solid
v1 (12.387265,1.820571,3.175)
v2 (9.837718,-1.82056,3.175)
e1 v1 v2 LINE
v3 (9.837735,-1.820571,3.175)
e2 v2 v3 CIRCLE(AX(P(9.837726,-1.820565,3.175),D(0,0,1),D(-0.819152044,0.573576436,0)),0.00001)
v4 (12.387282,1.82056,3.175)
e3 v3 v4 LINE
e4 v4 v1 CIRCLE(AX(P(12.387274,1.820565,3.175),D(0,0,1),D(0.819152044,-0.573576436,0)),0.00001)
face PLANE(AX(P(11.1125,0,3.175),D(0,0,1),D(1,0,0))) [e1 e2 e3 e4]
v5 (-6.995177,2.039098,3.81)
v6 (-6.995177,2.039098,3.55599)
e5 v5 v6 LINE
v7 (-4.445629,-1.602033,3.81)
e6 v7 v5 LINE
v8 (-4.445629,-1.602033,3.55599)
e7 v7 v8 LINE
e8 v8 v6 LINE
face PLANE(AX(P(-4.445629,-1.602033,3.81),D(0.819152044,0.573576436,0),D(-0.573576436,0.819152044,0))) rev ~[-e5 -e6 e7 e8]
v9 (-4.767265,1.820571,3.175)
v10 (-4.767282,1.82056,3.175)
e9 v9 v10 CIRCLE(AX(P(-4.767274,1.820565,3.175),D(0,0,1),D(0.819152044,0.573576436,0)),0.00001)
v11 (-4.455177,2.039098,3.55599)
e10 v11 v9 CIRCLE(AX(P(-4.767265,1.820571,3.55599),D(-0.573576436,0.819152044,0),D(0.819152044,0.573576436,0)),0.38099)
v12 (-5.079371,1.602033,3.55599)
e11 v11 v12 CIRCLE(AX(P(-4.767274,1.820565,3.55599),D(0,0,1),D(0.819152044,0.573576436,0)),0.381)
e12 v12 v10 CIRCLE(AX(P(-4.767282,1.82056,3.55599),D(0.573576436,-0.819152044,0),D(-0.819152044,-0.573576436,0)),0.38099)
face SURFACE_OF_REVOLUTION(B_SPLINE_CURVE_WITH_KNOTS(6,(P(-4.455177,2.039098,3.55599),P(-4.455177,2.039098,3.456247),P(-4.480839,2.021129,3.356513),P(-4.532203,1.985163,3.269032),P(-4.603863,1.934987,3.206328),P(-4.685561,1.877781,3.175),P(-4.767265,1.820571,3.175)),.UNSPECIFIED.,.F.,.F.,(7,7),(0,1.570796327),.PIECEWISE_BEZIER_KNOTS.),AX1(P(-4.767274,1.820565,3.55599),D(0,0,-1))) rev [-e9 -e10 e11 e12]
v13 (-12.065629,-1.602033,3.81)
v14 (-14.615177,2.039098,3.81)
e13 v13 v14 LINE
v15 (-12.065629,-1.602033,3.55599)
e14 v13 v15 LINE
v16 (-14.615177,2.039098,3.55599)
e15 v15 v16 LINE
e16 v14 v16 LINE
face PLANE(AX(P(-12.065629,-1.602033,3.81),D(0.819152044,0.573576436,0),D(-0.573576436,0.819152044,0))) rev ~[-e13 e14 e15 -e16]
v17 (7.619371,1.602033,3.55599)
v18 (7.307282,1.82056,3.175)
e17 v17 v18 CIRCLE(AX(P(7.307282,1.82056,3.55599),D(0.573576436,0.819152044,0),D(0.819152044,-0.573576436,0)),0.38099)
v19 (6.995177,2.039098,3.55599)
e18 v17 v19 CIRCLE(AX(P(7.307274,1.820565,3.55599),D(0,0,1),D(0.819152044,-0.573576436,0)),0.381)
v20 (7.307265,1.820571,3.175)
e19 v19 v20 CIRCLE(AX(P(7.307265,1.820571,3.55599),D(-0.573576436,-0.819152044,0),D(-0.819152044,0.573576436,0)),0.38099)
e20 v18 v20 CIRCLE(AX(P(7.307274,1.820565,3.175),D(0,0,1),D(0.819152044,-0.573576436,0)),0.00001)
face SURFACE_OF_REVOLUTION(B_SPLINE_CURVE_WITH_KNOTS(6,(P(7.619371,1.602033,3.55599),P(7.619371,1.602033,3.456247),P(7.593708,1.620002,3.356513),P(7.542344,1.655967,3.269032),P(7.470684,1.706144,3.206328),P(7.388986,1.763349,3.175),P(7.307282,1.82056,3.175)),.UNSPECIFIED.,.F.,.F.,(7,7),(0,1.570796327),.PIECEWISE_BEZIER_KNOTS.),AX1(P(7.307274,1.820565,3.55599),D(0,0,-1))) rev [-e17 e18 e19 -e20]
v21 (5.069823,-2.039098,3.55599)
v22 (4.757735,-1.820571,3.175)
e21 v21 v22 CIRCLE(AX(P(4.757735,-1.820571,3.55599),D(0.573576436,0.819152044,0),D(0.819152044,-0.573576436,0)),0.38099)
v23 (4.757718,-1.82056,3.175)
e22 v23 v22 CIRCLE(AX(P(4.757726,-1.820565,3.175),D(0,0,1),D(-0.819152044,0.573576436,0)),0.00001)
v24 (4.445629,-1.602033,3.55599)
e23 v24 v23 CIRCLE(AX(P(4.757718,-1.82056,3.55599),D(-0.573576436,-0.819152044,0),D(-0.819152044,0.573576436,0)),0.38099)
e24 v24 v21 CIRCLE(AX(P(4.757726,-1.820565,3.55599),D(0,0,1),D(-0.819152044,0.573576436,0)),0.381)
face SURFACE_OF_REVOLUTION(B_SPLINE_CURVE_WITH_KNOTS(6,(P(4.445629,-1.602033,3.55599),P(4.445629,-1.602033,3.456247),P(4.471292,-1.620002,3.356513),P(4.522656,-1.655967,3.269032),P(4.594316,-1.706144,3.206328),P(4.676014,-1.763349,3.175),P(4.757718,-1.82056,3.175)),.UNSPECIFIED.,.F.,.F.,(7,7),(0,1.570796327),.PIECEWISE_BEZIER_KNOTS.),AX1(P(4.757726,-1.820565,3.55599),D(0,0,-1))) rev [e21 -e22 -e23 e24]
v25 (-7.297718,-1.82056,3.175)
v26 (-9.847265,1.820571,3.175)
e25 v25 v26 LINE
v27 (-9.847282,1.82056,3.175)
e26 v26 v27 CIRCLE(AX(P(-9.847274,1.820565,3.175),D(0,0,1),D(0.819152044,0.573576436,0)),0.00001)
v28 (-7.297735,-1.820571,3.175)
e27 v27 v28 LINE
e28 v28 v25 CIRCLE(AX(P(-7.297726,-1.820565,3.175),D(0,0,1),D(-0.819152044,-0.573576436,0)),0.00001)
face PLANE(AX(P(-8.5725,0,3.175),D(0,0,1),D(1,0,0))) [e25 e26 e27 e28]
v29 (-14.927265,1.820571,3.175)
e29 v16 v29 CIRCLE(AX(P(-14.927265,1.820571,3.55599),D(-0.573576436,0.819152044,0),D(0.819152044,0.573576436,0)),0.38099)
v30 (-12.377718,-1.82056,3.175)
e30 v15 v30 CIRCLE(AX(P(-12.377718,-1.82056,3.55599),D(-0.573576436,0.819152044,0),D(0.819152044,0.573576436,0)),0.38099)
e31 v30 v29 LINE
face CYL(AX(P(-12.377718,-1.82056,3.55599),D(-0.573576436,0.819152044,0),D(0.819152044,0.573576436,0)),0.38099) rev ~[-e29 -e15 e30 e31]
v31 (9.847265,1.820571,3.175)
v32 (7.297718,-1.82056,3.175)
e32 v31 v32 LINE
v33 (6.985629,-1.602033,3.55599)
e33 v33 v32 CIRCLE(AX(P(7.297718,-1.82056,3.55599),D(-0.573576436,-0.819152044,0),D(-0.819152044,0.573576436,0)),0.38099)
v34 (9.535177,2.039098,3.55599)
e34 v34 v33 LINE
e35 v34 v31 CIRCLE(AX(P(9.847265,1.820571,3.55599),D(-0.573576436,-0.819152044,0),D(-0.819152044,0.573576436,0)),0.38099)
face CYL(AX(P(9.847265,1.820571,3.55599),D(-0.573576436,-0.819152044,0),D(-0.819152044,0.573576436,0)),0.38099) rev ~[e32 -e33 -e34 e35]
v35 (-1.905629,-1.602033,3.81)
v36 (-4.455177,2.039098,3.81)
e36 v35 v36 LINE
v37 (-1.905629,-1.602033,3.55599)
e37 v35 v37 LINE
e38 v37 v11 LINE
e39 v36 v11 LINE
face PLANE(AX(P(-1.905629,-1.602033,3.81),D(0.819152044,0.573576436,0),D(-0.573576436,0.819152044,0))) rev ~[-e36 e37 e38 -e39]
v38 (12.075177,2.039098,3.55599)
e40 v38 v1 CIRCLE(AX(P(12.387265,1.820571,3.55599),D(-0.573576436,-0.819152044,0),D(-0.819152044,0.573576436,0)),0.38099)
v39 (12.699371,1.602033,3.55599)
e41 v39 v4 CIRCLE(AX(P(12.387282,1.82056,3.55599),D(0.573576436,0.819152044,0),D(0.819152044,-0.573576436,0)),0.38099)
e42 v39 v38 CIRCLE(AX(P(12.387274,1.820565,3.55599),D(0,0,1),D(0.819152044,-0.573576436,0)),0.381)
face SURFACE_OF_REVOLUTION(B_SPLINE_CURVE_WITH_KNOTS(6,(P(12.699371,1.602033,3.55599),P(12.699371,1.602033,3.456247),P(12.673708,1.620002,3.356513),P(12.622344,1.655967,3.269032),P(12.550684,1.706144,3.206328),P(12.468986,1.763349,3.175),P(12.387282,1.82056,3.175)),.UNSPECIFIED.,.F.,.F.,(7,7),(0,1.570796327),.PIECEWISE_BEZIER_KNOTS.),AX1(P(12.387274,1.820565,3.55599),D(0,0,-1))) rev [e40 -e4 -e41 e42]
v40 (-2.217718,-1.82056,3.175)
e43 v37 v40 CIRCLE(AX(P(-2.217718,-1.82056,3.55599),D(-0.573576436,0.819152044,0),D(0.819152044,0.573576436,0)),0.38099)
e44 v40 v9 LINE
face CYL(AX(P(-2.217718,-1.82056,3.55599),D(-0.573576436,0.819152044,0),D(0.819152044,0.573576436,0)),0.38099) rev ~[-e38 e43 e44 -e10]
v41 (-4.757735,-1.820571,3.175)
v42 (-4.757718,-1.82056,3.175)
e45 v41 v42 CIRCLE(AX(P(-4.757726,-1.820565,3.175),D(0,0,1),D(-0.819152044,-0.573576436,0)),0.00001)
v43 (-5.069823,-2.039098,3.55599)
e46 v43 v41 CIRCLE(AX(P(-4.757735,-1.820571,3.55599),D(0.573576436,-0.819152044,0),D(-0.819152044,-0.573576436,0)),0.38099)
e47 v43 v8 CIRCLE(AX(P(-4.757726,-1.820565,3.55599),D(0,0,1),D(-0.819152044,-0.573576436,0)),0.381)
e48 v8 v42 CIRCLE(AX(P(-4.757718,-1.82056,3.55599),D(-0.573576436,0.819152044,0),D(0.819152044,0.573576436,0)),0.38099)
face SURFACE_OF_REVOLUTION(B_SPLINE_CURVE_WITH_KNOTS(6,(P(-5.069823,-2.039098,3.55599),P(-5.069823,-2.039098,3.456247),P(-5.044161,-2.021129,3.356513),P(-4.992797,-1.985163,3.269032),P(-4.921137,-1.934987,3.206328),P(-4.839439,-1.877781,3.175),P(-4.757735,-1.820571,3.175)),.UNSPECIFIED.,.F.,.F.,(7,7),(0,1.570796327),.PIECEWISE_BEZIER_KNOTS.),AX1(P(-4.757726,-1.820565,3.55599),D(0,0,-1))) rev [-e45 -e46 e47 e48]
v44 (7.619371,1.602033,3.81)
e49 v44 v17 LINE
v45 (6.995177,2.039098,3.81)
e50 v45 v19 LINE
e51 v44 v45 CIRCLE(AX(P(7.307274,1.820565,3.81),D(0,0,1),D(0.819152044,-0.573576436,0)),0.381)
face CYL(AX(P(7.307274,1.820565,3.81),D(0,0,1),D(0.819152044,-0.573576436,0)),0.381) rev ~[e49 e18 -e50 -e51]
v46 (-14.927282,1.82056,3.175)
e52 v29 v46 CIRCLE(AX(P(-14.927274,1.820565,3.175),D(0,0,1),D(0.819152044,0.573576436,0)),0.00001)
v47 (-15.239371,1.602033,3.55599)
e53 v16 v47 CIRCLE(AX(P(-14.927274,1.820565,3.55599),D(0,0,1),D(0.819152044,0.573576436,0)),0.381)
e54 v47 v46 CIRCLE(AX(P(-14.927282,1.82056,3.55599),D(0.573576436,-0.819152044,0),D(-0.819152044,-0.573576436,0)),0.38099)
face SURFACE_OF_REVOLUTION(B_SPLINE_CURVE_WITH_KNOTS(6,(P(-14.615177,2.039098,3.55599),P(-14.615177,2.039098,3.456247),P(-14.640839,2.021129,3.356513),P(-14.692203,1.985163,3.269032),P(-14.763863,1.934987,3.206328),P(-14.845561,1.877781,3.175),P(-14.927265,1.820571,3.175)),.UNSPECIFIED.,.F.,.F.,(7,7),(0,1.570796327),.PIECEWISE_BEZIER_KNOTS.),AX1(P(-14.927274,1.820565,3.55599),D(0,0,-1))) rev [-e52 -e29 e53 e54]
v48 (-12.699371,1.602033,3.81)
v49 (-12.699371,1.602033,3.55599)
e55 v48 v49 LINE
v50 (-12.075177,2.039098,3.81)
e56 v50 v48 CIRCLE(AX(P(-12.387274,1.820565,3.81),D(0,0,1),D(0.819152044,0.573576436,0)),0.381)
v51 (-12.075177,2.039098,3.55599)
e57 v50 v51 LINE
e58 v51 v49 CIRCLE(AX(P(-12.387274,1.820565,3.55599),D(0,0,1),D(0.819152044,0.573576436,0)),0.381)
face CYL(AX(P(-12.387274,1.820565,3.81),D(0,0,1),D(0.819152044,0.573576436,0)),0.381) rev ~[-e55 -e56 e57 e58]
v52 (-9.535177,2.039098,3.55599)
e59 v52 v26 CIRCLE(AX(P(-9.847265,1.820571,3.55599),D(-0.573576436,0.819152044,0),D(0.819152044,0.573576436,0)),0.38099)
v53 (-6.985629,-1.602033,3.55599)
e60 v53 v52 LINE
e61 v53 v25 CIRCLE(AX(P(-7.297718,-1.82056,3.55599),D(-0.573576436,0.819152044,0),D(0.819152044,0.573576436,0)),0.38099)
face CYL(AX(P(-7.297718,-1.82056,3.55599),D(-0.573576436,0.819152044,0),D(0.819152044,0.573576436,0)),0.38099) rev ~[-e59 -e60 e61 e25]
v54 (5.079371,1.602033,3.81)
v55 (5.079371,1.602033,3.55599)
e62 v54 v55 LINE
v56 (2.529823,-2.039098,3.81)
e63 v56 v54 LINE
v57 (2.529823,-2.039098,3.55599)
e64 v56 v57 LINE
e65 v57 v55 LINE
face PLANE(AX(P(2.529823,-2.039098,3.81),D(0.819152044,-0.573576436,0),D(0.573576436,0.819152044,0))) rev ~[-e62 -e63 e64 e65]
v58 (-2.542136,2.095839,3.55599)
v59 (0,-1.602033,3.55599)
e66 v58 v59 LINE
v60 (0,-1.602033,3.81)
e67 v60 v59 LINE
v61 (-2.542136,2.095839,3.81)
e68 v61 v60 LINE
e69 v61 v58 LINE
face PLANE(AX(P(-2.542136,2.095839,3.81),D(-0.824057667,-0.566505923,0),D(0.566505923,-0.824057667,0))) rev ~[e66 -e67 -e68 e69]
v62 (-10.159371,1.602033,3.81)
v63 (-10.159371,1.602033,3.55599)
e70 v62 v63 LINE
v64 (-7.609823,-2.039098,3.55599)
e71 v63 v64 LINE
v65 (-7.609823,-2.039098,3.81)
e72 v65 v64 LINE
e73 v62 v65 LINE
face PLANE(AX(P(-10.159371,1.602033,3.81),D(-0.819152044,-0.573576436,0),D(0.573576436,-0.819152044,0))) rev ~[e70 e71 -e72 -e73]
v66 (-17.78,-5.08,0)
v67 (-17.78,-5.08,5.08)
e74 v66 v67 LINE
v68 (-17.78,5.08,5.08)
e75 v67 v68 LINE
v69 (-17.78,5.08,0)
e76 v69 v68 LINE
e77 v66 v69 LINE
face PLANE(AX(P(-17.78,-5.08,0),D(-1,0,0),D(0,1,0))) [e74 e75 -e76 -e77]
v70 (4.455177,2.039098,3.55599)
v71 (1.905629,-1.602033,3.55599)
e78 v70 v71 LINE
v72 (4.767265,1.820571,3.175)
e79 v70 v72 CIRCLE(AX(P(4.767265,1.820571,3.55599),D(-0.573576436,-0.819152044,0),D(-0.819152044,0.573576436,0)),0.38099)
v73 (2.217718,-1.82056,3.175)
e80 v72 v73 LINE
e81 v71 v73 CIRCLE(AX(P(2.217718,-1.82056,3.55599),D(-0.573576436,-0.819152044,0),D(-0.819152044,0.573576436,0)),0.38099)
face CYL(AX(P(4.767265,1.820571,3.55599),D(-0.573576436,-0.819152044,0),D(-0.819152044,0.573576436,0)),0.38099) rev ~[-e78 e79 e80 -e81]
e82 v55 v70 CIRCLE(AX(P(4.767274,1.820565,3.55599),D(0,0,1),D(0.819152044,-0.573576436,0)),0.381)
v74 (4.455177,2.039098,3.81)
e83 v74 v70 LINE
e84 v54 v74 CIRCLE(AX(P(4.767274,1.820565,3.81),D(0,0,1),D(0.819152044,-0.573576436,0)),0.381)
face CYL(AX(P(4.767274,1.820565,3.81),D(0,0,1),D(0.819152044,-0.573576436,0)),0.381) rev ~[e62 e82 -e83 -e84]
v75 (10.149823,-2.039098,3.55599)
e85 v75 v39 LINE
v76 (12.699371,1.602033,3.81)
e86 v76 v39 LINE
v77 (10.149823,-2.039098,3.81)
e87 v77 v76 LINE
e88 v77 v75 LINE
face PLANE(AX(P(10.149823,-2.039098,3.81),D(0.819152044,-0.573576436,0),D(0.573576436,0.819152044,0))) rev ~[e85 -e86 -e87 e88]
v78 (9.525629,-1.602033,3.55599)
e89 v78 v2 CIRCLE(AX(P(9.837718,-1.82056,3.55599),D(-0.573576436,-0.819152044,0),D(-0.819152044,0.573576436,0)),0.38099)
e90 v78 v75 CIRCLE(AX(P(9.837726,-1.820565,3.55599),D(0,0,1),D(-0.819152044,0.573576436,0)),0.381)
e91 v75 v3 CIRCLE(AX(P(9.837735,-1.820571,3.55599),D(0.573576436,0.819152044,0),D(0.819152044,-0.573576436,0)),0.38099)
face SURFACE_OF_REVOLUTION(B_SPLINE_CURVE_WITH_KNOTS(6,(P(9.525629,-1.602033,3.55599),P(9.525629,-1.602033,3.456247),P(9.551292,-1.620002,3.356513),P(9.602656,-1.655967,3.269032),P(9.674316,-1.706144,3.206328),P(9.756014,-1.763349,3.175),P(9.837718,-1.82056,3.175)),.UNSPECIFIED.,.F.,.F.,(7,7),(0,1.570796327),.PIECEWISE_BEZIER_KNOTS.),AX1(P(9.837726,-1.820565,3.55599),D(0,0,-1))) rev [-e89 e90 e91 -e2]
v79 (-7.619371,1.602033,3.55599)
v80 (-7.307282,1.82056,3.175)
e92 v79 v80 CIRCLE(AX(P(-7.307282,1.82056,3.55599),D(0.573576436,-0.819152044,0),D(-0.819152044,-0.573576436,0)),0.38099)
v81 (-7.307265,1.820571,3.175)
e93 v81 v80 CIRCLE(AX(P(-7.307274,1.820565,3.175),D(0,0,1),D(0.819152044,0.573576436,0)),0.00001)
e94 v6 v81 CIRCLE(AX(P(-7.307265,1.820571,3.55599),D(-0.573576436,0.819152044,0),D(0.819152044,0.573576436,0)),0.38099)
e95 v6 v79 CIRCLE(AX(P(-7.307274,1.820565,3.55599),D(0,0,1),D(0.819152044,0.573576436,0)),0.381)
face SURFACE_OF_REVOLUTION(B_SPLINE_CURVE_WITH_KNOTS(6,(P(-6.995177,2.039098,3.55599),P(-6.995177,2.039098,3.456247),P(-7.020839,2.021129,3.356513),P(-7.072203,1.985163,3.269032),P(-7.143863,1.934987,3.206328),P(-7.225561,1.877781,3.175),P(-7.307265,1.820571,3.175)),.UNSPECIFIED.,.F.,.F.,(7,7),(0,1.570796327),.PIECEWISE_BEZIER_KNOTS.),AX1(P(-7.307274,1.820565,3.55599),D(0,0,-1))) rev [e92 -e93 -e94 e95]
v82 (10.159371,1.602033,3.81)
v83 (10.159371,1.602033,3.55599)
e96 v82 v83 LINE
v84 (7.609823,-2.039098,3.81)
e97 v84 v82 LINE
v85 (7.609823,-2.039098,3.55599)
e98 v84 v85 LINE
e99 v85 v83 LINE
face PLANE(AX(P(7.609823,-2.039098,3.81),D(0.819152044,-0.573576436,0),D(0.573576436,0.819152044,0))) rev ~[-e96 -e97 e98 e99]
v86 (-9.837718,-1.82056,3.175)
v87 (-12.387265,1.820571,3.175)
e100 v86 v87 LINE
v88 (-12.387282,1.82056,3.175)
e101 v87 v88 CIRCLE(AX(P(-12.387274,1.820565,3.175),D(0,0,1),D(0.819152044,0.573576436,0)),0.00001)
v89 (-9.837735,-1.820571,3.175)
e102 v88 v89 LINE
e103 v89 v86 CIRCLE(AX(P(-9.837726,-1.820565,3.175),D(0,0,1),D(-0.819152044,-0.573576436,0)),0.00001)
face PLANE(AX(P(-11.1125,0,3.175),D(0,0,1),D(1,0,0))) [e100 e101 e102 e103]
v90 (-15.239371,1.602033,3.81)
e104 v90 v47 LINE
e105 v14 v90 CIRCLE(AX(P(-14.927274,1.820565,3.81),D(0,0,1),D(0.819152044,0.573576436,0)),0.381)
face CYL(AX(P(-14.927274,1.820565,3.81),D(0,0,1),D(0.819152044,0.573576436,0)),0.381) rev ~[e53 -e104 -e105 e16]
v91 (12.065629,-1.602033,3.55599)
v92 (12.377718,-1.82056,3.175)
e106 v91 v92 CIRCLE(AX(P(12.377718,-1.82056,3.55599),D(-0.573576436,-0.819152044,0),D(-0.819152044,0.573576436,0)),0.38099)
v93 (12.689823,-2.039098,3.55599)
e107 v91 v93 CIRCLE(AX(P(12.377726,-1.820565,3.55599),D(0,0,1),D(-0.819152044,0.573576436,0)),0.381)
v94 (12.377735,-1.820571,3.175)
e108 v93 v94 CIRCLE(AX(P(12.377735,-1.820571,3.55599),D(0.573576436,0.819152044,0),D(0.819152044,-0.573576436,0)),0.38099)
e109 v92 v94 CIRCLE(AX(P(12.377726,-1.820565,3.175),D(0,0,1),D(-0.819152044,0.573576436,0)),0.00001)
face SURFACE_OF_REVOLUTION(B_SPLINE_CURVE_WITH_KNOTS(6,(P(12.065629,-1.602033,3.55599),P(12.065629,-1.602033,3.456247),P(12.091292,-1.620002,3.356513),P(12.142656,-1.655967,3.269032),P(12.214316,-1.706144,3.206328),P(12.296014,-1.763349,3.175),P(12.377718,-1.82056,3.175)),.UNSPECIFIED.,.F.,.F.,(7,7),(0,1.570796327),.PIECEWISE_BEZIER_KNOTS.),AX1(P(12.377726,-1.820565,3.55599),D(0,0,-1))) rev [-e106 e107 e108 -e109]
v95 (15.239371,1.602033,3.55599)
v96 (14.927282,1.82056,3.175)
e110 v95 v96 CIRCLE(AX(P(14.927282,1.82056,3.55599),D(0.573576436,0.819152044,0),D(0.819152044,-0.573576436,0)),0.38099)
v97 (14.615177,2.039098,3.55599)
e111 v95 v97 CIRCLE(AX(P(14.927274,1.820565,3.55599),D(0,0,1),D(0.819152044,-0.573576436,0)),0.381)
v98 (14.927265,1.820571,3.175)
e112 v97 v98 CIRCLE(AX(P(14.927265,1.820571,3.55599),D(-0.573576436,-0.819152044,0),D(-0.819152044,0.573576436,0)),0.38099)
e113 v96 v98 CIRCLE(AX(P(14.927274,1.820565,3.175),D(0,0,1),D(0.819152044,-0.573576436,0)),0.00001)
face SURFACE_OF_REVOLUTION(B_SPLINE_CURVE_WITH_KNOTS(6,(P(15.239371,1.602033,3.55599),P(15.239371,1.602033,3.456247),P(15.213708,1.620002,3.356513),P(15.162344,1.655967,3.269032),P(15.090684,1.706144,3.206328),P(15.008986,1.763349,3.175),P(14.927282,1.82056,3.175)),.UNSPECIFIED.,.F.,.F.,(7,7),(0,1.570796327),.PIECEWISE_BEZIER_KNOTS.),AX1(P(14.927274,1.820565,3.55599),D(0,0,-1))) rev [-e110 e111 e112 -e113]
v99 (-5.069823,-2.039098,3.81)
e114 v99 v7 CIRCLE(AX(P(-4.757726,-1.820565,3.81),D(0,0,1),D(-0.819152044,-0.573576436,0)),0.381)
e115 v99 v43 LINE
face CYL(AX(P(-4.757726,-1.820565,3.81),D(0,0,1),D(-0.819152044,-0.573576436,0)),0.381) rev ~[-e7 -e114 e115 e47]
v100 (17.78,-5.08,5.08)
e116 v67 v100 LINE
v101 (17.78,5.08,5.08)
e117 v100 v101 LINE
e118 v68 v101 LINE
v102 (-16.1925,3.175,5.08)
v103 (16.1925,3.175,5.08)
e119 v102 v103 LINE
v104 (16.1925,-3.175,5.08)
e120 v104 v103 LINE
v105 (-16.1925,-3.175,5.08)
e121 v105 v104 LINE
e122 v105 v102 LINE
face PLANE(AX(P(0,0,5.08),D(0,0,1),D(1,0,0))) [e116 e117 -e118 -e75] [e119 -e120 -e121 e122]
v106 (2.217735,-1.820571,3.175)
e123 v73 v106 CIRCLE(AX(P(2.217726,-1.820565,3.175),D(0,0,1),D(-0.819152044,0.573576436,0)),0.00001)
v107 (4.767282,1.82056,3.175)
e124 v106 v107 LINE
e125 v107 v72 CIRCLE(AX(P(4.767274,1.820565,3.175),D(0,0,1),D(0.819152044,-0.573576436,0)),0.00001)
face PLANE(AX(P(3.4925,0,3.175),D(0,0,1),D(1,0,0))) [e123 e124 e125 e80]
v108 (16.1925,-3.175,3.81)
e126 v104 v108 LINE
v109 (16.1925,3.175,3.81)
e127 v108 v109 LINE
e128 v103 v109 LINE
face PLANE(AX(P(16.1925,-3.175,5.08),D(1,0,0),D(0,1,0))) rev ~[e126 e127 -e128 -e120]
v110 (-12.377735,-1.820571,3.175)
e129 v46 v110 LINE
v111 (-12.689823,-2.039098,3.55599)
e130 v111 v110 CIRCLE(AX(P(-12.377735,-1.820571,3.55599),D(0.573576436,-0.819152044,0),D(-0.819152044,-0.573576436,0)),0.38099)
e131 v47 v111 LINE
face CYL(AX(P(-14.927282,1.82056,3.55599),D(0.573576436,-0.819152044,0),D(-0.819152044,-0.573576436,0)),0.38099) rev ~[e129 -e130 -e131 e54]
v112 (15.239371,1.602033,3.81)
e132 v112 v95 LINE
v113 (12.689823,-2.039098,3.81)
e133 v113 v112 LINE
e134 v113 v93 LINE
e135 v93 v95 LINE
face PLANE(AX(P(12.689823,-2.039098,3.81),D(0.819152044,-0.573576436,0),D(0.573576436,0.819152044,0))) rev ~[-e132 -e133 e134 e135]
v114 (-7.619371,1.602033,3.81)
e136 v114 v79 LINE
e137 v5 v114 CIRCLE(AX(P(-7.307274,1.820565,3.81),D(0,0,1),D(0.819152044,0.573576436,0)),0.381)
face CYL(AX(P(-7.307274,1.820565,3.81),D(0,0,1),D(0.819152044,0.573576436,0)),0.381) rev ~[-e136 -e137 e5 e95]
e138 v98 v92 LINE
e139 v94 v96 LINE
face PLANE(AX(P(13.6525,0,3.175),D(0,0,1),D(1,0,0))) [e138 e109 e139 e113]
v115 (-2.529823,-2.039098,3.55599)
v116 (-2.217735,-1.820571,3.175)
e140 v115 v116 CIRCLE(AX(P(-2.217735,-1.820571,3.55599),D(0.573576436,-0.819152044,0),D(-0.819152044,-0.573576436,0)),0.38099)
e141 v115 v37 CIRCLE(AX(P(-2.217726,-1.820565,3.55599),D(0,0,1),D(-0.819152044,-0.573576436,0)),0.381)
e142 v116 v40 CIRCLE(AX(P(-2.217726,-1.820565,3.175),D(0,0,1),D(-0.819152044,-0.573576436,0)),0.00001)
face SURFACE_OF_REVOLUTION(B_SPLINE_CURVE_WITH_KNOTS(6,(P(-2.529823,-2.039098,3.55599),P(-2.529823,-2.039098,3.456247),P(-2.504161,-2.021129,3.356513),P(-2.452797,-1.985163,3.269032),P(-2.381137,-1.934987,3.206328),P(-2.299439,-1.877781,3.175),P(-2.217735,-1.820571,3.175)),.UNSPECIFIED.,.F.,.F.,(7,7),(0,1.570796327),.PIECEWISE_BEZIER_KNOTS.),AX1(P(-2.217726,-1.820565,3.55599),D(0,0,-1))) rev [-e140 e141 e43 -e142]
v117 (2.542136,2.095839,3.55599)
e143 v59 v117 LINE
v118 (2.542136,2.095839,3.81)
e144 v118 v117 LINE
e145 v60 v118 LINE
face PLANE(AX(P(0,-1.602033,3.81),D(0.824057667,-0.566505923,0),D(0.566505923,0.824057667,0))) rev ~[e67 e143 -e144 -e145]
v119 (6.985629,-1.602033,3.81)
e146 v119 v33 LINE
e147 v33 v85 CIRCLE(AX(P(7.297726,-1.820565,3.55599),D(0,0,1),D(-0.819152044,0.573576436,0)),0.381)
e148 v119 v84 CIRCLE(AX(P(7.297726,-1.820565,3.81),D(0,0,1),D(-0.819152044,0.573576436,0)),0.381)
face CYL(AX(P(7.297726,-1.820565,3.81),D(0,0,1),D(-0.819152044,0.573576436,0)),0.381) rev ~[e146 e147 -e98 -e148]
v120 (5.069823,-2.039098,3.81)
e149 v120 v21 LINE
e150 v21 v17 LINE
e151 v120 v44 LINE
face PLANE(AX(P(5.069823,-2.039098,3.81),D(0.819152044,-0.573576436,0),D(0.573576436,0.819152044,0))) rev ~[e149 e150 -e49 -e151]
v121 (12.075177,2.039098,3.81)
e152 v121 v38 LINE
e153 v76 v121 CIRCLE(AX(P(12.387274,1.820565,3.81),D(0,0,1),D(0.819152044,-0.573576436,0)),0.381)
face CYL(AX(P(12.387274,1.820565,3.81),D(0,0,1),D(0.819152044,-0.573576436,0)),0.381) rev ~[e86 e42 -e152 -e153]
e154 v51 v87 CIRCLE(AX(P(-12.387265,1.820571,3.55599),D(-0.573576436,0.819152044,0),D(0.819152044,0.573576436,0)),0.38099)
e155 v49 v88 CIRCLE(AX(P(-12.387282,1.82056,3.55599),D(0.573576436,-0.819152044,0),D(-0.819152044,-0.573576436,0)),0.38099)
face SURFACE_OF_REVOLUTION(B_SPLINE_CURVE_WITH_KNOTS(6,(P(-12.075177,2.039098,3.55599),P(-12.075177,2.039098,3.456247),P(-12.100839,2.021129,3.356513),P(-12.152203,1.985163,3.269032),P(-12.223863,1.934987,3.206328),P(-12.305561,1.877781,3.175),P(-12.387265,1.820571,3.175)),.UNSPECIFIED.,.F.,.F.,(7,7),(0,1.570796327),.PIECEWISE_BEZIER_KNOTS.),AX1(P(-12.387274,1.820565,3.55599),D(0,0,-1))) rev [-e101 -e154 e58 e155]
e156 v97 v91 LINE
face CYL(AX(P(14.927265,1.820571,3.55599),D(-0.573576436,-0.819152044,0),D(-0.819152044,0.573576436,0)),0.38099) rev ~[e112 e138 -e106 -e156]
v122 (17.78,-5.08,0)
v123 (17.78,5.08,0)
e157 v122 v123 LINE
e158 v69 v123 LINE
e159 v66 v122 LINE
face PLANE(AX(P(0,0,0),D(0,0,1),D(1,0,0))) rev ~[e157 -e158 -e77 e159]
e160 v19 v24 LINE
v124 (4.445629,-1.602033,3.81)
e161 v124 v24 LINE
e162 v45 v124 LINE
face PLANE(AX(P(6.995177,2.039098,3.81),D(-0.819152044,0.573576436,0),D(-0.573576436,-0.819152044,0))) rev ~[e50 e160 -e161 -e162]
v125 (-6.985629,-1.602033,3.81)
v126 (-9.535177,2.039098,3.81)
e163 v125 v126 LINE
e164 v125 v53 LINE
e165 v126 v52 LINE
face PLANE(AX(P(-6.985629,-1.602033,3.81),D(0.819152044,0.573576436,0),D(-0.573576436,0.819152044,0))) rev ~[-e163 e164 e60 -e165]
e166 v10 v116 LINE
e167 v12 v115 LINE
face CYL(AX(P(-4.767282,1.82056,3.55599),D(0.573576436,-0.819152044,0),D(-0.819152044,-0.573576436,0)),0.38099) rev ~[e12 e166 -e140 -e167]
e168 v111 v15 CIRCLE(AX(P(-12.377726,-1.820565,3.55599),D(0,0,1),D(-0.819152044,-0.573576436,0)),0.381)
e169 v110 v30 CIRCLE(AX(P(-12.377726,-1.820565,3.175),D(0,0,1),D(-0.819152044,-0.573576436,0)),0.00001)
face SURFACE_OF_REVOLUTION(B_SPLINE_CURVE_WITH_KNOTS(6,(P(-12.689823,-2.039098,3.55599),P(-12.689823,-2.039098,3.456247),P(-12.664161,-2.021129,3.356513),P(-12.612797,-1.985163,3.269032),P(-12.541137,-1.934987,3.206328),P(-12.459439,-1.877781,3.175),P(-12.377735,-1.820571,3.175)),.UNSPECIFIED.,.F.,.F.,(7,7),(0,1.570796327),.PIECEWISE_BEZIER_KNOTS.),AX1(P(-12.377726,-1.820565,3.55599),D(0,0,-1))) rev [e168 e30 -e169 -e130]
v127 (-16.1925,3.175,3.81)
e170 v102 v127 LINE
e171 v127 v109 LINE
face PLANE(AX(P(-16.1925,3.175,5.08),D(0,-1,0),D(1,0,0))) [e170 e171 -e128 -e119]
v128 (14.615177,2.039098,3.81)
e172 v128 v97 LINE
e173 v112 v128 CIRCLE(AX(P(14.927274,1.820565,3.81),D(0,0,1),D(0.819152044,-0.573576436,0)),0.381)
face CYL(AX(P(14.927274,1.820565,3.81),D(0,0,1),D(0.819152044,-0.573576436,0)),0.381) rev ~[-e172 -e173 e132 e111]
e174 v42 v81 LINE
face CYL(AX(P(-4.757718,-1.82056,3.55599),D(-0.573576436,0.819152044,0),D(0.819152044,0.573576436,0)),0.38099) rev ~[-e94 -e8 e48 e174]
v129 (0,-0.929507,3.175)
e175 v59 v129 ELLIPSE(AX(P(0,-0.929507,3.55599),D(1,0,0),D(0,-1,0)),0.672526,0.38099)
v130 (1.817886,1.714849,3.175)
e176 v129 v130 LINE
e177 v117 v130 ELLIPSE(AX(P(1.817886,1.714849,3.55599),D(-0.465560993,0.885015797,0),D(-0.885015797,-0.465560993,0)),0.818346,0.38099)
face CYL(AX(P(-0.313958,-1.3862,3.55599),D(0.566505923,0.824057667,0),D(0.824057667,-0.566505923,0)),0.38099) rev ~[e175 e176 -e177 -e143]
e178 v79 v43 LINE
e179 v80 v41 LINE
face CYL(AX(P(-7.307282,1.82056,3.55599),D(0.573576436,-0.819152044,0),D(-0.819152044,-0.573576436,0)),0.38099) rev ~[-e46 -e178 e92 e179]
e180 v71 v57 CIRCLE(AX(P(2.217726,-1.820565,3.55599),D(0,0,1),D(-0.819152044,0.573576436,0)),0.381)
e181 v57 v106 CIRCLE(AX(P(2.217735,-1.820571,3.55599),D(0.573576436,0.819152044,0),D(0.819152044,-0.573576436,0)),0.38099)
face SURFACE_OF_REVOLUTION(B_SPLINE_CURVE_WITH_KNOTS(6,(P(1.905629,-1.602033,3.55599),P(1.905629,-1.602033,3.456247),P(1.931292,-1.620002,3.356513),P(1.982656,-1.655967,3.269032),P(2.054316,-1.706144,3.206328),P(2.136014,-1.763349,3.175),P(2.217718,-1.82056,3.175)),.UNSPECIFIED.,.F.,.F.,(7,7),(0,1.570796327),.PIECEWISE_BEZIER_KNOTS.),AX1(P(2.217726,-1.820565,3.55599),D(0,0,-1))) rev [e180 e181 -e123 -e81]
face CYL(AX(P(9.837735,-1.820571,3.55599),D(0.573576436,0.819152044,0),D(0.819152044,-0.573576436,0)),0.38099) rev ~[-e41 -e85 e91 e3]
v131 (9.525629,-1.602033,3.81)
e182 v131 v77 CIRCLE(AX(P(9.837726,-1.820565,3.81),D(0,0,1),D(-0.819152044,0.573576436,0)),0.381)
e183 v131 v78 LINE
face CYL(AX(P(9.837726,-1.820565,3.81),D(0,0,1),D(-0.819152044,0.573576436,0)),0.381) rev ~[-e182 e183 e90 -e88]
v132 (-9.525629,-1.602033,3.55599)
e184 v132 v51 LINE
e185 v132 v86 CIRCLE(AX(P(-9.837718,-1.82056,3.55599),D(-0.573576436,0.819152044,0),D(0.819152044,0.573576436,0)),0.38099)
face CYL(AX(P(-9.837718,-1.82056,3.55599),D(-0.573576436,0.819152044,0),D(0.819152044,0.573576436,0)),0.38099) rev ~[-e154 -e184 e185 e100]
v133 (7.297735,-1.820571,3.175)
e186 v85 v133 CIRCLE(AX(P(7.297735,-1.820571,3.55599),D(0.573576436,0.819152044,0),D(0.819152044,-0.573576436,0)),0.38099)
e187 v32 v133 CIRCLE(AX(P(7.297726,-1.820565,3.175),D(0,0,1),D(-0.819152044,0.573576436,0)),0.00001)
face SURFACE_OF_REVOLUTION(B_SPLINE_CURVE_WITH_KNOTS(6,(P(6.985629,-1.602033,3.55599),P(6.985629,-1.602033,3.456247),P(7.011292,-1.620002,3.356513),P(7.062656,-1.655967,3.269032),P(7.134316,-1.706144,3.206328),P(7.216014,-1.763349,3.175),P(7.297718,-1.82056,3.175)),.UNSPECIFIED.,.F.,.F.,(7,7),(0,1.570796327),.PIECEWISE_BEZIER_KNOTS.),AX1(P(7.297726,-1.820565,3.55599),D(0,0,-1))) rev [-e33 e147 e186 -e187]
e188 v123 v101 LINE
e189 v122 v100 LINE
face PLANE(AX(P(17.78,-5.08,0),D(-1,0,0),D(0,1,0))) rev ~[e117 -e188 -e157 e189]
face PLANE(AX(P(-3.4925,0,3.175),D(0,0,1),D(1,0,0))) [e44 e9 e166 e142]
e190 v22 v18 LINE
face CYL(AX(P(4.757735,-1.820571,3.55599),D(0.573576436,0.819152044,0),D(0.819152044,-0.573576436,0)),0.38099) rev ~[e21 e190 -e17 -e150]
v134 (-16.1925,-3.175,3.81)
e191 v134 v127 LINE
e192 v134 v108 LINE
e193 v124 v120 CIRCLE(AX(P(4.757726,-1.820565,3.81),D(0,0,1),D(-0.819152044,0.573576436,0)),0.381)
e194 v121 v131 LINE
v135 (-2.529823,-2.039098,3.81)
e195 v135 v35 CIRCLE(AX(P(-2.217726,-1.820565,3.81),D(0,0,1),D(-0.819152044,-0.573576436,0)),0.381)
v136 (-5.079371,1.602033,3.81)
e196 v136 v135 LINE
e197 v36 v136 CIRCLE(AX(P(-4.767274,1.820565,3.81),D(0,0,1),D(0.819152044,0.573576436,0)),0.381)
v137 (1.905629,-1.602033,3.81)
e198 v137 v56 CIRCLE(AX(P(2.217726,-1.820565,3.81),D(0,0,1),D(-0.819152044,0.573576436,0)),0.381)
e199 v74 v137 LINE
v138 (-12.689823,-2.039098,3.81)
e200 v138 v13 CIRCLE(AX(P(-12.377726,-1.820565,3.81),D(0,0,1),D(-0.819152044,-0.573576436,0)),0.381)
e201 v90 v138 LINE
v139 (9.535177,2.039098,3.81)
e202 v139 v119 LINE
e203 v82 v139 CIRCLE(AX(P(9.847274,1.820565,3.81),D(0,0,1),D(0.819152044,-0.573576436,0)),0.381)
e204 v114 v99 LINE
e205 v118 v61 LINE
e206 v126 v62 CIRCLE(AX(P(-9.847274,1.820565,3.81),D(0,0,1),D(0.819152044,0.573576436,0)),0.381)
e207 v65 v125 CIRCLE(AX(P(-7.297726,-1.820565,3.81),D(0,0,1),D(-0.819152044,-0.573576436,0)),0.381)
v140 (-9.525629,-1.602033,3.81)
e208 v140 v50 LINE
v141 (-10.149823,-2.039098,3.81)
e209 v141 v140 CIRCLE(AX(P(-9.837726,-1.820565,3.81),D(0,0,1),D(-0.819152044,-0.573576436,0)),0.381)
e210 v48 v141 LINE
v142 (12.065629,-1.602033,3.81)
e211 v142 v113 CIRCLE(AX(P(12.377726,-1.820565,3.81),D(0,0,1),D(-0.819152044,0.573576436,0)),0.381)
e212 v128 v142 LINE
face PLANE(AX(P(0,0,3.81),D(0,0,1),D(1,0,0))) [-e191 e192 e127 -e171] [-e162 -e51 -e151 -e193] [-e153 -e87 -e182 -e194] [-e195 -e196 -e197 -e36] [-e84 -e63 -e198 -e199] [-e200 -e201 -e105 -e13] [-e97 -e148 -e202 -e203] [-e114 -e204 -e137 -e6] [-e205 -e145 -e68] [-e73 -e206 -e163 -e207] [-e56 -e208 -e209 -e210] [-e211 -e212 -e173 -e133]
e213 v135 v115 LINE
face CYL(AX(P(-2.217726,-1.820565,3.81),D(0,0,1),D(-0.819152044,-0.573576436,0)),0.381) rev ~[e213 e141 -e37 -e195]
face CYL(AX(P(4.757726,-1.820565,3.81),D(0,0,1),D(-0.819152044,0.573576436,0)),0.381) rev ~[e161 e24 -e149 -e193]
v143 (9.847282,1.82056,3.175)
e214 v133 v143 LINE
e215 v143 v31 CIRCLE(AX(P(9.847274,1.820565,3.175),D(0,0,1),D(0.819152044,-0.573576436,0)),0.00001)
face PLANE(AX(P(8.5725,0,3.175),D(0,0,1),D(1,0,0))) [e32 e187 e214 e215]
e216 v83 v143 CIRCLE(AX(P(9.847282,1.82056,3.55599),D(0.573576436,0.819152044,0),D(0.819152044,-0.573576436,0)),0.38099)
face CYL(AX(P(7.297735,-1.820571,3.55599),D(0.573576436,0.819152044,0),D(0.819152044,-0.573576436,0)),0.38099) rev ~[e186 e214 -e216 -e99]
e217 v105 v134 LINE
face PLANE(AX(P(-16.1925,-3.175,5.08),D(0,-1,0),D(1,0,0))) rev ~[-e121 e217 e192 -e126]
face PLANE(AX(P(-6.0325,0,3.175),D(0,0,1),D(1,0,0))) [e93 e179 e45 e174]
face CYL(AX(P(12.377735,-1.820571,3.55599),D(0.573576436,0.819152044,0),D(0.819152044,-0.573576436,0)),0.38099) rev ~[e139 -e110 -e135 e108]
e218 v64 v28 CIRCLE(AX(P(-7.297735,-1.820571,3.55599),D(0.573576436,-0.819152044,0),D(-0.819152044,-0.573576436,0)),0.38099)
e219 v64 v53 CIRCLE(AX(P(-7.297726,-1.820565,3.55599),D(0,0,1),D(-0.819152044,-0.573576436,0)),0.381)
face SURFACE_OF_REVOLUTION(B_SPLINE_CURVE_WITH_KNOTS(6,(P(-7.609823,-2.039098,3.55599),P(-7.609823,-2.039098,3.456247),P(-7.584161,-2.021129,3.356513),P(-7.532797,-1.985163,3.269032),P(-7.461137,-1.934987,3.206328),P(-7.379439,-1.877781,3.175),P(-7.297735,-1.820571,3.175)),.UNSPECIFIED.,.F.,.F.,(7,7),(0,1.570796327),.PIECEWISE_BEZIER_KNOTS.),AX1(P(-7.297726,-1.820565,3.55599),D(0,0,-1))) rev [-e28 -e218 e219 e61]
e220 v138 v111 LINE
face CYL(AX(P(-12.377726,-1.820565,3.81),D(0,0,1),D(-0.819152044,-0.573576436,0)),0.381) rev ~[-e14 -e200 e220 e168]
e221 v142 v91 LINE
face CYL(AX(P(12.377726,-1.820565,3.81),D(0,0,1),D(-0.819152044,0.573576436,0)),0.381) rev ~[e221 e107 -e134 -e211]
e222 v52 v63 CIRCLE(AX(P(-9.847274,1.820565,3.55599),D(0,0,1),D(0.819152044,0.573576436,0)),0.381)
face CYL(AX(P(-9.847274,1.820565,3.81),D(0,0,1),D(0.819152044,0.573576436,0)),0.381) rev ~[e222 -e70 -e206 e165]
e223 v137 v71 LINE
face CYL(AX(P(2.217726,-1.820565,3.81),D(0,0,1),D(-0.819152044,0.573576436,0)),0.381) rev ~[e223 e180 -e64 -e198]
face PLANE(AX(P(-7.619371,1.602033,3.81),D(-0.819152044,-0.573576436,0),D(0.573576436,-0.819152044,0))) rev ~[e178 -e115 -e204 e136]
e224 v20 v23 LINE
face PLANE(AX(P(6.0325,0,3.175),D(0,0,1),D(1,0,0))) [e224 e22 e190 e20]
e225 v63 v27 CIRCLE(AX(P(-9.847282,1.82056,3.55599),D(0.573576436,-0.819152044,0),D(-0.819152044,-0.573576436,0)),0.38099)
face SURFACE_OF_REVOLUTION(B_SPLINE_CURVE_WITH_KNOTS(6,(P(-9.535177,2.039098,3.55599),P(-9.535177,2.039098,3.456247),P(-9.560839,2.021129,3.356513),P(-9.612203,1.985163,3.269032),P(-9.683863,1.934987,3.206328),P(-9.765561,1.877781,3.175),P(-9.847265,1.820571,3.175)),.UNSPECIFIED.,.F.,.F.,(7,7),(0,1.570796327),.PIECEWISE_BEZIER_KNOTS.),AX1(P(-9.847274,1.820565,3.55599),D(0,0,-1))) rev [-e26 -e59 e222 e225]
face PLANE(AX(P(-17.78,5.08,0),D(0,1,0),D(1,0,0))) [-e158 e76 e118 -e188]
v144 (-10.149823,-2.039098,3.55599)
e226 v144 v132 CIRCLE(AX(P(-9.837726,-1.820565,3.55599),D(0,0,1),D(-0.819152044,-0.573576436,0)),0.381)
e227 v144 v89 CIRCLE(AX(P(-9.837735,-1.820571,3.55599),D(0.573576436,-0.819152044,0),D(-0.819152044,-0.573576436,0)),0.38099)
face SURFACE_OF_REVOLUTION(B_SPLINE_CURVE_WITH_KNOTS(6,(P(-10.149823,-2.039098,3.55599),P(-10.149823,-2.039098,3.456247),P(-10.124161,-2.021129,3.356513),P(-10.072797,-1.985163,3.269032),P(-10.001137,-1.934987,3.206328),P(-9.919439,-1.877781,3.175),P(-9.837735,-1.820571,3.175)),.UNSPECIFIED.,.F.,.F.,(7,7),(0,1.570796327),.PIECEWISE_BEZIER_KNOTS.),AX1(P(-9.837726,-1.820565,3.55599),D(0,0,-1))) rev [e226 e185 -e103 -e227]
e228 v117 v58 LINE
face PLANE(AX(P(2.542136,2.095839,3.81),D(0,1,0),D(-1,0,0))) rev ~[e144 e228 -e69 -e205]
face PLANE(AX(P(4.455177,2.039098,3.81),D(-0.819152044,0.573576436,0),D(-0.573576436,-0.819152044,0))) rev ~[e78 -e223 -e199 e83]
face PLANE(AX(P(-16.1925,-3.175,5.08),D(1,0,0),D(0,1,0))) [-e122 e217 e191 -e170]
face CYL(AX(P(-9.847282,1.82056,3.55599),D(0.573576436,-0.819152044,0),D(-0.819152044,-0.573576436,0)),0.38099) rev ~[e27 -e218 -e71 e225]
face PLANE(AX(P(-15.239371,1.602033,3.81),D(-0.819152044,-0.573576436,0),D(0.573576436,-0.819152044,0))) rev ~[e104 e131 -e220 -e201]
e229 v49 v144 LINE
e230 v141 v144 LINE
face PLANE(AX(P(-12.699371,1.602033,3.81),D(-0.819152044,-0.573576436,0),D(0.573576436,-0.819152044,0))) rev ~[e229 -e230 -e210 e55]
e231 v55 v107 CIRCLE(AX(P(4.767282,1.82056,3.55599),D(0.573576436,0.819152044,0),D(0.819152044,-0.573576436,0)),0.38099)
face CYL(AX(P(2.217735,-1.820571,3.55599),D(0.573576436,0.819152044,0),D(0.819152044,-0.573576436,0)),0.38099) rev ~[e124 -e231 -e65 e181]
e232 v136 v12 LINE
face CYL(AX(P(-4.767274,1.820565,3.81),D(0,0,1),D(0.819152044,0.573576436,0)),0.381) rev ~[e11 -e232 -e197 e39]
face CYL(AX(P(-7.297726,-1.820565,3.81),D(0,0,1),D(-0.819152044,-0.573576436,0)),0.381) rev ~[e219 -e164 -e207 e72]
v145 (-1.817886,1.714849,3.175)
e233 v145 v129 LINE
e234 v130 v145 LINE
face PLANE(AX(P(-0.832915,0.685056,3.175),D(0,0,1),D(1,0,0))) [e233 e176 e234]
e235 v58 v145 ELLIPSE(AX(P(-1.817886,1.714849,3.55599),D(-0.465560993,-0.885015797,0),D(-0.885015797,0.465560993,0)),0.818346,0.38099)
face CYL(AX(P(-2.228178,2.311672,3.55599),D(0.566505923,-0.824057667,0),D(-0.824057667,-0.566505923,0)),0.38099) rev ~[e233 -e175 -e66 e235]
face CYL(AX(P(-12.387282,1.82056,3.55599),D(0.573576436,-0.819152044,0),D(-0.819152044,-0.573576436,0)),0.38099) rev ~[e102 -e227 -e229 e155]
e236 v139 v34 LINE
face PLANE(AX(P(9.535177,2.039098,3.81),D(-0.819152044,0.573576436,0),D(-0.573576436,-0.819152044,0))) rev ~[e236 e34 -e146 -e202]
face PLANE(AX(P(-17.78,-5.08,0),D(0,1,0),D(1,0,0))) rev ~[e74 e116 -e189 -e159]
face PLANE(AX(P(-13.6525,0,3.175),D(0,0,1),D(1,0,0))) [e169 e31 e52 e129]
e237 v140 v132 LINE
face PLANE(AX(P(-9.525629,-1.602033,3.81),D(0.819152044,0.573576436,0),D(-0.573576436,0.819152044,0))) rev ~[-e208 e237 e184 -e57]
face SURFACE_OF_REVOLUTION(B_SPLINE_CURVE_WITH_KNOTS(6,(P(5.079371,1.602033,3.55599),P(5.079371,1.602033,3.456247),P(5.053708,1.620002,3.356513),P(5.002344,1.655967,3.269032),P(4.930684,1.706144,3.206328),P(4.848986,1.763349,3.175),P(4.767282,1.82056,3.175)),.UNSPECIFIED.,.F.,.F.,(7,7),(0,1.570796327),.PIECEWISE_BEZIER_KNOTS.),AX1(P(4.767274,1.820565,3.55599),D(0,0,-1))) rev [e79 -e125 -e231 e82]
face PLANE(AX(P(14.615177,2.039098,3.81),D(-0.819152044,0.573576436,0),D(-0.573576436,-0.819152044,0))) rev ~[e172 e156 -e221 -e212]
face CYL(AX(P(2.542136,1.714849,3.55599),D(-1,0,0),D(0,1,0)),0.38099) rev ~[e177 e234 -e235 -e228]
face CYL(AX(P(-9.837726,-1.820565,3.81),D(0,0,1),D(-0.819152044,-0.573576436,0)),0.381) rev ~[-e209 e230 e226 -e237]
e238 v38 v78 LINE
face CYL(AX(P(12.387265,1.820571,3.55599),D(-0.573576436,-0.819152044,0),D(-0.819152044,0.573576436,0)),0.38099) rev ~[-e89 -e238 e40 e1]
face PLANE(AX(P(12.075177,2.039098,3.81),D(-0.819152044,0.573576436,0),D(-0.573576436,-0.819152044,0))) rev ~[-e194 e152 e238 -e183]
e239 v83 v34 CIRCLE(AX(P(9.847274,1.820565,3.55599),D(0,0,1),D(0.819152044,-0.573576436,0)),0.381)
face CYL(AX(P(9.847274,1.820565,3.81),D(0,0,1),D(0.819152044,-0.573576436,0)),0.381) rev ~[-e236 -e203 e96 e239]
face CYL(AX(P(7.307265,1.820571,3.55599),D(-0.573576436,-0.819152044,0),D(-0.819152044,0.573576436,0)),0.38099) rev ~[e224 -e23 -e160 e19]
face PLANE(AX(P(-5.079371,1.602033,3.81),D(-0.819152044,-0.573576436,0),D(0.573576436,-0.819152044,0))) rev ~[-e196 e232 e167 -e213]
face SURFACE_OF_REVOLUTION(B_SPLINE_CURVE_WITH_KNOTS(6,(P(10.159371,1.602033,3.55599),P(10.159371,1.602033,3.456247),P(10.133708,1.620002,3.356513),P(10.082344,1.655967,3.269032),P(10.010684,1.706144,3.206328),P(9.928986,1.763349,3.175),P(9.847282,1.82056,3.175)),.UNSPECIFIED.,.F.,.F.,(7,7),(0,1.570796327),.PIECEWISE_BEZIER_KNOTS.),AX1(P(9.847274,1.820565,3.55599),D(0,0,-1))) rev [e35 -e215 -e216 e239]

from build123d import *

# Parameters (mm, degrees)
F0_W     = 35.56
F0_H     = 10.16
F1_DEPTH = 5.08
F2_W     = 32.385
F2_H     = 6.35
F3_DEPTH = 1.27
F5_DEPTH = 0.635
F6_R     = 0.38099


# Not quite as in the source:
# - a fillet or chamfer is up to 0.001 mm smaller than in the source, because OpenCascade refuses the exact size


with BuildPart() as f1:
    # F0 (on Top) → F1 (new body)
    with BuildSketch(Plane.XY):
        Rectangle(F0_W, F0_H)
    extrude(amount=F1_DEPTH)

    # F2 (on face) → F3 (cut)
    with BuildSketch(Plane.XY.offset(5.08)):
        Rectangle(F2_W, F2_H)
    extrude(amount=-F3_DEPTH, mode=Mode.SUBTRACT)

    # F4 (on face) → F5 (cut)
    with BuildSketch(Plane.XY.offset(3.81)):
        with BuildLine():
            ThreePointArc((-14.6151767009, 2.0390980407), (-15.145806252, 2.1326623473), (-15.2393705587, 1.6020327962))
            Line((-15.2393705587, 1.6020327962), (-12.6898232991, -2.0390980407))
            ThreePointArc((-12.6898232991, -2.0390980407), (-12.159193748, -2.1326623473), (-12.0656294413, -1.6020327962))
            Line((-12.0656294413, -1.6020327962), (-14.6151767009, 2.0390980407))
        make_face()
        with BuildLine():
            Line((-9.5256294413, -1.6020327962), (-12.0751767009, 2.0390980407))
            ThreePointArc((-12.0751767009, 2.0390980407), (-12.605806252, 2.1326623473), (-12.6993705587, 1.6020327962))
            Line((-12.6993705587, 1.6020327962), (-10.1498232991, -2.0390980407))
            ThreePointArc((-10.1498232991, -2.0390980407), (-9.619193748, -2.1326623473), (-9.5256294413, -1.6020327962))
        make_face()
        with BuildLine():
            Line((-6.9856294413, -1.6020327962), (-9.5351767009, 2.0390980407))
            ThreePointArc((-9.5351767009, 2.0390980407), (-10.065806252, 2.1326623473), (-10.1593705587, 1.6020327962))
            Line((-10.1593705587, 1.6020327962), (-7.6098232991, -2.0390980407))
            ThreePointArc((-7.6098232991, -2.0390980407), (-7.079193748, -2.1326623473), (-6.9856294413, -1.6020327962))
        make_face()
        with BuildLine():
            Line((-4.4456294413, -1.6020327962), (-6.9951767009, 2.0390980407))
            ThreePointArc((-6.9951767009, 2.0390980407), (-7.525806252, 2.1326623473), (-7.6193705587, 1.6020327962))
            Line((-7.6193705587, 1.6020327962), (-5.0698232991, -2.0390980407))
            ThreePointArc((-5.0698232991, -2.0390980407), (-4.539193748, -2.1326623473), (-4.4456294413, -1.6020327962))
        make_face()
        with BuildLine():
            Line((-1.9056294413, -1.6020327962), (-4.4551767009, 2.0390980407))
            ThreePointArc((-4.4551767009, 2.0390980407), (-4.985806252, 2.1326623473), (-5.0793705587, 1.6020327962))
            Line((-5.0793705587, 1.6020327962), (-2.5298232991, -2.0390980407))
            ThreePointArc((-2.5298232991, -2.0390980407), (-1.999193748, -2.1326623473), (-1.9056294413, -1.6020327962))
        make_face()
        with BuildLine():
            Line((12.6898232991, -2.0390980407), (15.2393705587, 1.6020327962))
            ThreePointArc((15.2393705587, 1.6020327962), (15.145806252, 2.1326623473), (14.6151767009, 2.0390980407))
            Line((14.6151767009, 2.0390980407), (12.0656294413, -1.6020327962))
            ThreePointArc((12.0656294413, -1.6020327962), (12.159193748, -2.1326623473), (12.6898232991, -2.0390980407))
        make_face()
        with BuildLine():
            Line((10.1498232991, -2.0390980407), (12.6993705587, 1.6020327962))
            ThreePointArc((12.6993705587, 1.6020327962), (12.605806252, 2.1326623473), (12.0751767009, 2.0390980407))
            Line((12.0751767009, 2.0390980407), (9.5256294413, -1.6020327962))
            ThreePointArc((9.5256294413, -1.6020327962), (9.619193748, -2.1326623473), (10.1498232991, -2.0390980407))
        make_face()
        with BuildLine():
            Line((9.5351767009, 2.0390980407), (6.9856294413, -1.6020327962))
            ThreePointArc((6.9856294413, -1.6020327962), (7.079193748, -2.1326623473), (7.6098232991, -2.0390980407))
            Line((7.6098232991, -2.0390980407), (10.1593705587, 1.6020327962))
            ThreePointArc((10.1593705587, 1.6020327962), (10.065806252, 2.1326623473), (9.5351767009, 2.0390980407))
        make_face()
        with BuildLine():
            Line((5.0698232991, -2.0390980407), (7.6193705587, 1.6020327962))
            ThreePointArc((7.6193705587, 1.6020327962), (7.525806252, 2.1326623473), (6.9951767009, 2.0390980407))
            Line((6.9951767009, 2.0390980407), (4.4456294413, -1.6020327962))
            ThreePointArc((4.4456294413, -1.6020327962), (4.539193748, -2.1326623473), (5.0698232991, -2.0390980407))
        make_face()
        with BuildLine():
            Line((2.5298232991, -2.0390980407), (5.0793705587, 1.6020327962))
            ThreePointArc((5.0793705587, 1.6020327962), (4.985806252, 2.1326623473), (4.4551767009, 2.0390980407))
            Line((4.4551767009, 2.0390980407), (1.9056294413, -1.6020327962))
            ThreePointArc((1.9056294413, -1.6020327962), (1.999193748, -2.1326623473), (2.5298232991, -2.0390980407))
        make_face()
        Polygon((-2.5421355385, 2.0958390087), (0, -1.6020327962), (0, 2.0958390087), align=None)
        Polygon((0, 2.0958390087), (0, -1.6020327962), (2.5421355385, 2.0958390087), align=None)
    extrude(amount=-F5_DEPTH, mode=Mode.SUBTRACT)

    # F6 (radius 0.381 in the source; OpenCascade refuses exactly that, so slightly less here)
    f6_edges = [f1.edges().sort_by_distance(p)[0] for p in [
        (-10.800403, 0.218533, 3.175),
        (-13.964597, -0.218533, 3.175),
        (-8.884597, -0.218533, 3.175),
        (-6.344597, -0.218533, 3.175),
        (-3.804597, -0.218533, 3.175),
        (3.180403, 0.218533, 3.175),
        (5.720403, 0.218533, 3.175),
        (8.260403, 0.218533, 3.175),
        (10.800403, 0.218533, 3.175),
        (13.340403, 0.218533, 3.175),
        (0, 2.095839, 3.175),
        (-1.271068, 0.246903, 3.175),
        (1.271068, 0.246903, 3.175),
    ]]
    fillet(f6_edges, radius=F6_R)


solid = f1.part
